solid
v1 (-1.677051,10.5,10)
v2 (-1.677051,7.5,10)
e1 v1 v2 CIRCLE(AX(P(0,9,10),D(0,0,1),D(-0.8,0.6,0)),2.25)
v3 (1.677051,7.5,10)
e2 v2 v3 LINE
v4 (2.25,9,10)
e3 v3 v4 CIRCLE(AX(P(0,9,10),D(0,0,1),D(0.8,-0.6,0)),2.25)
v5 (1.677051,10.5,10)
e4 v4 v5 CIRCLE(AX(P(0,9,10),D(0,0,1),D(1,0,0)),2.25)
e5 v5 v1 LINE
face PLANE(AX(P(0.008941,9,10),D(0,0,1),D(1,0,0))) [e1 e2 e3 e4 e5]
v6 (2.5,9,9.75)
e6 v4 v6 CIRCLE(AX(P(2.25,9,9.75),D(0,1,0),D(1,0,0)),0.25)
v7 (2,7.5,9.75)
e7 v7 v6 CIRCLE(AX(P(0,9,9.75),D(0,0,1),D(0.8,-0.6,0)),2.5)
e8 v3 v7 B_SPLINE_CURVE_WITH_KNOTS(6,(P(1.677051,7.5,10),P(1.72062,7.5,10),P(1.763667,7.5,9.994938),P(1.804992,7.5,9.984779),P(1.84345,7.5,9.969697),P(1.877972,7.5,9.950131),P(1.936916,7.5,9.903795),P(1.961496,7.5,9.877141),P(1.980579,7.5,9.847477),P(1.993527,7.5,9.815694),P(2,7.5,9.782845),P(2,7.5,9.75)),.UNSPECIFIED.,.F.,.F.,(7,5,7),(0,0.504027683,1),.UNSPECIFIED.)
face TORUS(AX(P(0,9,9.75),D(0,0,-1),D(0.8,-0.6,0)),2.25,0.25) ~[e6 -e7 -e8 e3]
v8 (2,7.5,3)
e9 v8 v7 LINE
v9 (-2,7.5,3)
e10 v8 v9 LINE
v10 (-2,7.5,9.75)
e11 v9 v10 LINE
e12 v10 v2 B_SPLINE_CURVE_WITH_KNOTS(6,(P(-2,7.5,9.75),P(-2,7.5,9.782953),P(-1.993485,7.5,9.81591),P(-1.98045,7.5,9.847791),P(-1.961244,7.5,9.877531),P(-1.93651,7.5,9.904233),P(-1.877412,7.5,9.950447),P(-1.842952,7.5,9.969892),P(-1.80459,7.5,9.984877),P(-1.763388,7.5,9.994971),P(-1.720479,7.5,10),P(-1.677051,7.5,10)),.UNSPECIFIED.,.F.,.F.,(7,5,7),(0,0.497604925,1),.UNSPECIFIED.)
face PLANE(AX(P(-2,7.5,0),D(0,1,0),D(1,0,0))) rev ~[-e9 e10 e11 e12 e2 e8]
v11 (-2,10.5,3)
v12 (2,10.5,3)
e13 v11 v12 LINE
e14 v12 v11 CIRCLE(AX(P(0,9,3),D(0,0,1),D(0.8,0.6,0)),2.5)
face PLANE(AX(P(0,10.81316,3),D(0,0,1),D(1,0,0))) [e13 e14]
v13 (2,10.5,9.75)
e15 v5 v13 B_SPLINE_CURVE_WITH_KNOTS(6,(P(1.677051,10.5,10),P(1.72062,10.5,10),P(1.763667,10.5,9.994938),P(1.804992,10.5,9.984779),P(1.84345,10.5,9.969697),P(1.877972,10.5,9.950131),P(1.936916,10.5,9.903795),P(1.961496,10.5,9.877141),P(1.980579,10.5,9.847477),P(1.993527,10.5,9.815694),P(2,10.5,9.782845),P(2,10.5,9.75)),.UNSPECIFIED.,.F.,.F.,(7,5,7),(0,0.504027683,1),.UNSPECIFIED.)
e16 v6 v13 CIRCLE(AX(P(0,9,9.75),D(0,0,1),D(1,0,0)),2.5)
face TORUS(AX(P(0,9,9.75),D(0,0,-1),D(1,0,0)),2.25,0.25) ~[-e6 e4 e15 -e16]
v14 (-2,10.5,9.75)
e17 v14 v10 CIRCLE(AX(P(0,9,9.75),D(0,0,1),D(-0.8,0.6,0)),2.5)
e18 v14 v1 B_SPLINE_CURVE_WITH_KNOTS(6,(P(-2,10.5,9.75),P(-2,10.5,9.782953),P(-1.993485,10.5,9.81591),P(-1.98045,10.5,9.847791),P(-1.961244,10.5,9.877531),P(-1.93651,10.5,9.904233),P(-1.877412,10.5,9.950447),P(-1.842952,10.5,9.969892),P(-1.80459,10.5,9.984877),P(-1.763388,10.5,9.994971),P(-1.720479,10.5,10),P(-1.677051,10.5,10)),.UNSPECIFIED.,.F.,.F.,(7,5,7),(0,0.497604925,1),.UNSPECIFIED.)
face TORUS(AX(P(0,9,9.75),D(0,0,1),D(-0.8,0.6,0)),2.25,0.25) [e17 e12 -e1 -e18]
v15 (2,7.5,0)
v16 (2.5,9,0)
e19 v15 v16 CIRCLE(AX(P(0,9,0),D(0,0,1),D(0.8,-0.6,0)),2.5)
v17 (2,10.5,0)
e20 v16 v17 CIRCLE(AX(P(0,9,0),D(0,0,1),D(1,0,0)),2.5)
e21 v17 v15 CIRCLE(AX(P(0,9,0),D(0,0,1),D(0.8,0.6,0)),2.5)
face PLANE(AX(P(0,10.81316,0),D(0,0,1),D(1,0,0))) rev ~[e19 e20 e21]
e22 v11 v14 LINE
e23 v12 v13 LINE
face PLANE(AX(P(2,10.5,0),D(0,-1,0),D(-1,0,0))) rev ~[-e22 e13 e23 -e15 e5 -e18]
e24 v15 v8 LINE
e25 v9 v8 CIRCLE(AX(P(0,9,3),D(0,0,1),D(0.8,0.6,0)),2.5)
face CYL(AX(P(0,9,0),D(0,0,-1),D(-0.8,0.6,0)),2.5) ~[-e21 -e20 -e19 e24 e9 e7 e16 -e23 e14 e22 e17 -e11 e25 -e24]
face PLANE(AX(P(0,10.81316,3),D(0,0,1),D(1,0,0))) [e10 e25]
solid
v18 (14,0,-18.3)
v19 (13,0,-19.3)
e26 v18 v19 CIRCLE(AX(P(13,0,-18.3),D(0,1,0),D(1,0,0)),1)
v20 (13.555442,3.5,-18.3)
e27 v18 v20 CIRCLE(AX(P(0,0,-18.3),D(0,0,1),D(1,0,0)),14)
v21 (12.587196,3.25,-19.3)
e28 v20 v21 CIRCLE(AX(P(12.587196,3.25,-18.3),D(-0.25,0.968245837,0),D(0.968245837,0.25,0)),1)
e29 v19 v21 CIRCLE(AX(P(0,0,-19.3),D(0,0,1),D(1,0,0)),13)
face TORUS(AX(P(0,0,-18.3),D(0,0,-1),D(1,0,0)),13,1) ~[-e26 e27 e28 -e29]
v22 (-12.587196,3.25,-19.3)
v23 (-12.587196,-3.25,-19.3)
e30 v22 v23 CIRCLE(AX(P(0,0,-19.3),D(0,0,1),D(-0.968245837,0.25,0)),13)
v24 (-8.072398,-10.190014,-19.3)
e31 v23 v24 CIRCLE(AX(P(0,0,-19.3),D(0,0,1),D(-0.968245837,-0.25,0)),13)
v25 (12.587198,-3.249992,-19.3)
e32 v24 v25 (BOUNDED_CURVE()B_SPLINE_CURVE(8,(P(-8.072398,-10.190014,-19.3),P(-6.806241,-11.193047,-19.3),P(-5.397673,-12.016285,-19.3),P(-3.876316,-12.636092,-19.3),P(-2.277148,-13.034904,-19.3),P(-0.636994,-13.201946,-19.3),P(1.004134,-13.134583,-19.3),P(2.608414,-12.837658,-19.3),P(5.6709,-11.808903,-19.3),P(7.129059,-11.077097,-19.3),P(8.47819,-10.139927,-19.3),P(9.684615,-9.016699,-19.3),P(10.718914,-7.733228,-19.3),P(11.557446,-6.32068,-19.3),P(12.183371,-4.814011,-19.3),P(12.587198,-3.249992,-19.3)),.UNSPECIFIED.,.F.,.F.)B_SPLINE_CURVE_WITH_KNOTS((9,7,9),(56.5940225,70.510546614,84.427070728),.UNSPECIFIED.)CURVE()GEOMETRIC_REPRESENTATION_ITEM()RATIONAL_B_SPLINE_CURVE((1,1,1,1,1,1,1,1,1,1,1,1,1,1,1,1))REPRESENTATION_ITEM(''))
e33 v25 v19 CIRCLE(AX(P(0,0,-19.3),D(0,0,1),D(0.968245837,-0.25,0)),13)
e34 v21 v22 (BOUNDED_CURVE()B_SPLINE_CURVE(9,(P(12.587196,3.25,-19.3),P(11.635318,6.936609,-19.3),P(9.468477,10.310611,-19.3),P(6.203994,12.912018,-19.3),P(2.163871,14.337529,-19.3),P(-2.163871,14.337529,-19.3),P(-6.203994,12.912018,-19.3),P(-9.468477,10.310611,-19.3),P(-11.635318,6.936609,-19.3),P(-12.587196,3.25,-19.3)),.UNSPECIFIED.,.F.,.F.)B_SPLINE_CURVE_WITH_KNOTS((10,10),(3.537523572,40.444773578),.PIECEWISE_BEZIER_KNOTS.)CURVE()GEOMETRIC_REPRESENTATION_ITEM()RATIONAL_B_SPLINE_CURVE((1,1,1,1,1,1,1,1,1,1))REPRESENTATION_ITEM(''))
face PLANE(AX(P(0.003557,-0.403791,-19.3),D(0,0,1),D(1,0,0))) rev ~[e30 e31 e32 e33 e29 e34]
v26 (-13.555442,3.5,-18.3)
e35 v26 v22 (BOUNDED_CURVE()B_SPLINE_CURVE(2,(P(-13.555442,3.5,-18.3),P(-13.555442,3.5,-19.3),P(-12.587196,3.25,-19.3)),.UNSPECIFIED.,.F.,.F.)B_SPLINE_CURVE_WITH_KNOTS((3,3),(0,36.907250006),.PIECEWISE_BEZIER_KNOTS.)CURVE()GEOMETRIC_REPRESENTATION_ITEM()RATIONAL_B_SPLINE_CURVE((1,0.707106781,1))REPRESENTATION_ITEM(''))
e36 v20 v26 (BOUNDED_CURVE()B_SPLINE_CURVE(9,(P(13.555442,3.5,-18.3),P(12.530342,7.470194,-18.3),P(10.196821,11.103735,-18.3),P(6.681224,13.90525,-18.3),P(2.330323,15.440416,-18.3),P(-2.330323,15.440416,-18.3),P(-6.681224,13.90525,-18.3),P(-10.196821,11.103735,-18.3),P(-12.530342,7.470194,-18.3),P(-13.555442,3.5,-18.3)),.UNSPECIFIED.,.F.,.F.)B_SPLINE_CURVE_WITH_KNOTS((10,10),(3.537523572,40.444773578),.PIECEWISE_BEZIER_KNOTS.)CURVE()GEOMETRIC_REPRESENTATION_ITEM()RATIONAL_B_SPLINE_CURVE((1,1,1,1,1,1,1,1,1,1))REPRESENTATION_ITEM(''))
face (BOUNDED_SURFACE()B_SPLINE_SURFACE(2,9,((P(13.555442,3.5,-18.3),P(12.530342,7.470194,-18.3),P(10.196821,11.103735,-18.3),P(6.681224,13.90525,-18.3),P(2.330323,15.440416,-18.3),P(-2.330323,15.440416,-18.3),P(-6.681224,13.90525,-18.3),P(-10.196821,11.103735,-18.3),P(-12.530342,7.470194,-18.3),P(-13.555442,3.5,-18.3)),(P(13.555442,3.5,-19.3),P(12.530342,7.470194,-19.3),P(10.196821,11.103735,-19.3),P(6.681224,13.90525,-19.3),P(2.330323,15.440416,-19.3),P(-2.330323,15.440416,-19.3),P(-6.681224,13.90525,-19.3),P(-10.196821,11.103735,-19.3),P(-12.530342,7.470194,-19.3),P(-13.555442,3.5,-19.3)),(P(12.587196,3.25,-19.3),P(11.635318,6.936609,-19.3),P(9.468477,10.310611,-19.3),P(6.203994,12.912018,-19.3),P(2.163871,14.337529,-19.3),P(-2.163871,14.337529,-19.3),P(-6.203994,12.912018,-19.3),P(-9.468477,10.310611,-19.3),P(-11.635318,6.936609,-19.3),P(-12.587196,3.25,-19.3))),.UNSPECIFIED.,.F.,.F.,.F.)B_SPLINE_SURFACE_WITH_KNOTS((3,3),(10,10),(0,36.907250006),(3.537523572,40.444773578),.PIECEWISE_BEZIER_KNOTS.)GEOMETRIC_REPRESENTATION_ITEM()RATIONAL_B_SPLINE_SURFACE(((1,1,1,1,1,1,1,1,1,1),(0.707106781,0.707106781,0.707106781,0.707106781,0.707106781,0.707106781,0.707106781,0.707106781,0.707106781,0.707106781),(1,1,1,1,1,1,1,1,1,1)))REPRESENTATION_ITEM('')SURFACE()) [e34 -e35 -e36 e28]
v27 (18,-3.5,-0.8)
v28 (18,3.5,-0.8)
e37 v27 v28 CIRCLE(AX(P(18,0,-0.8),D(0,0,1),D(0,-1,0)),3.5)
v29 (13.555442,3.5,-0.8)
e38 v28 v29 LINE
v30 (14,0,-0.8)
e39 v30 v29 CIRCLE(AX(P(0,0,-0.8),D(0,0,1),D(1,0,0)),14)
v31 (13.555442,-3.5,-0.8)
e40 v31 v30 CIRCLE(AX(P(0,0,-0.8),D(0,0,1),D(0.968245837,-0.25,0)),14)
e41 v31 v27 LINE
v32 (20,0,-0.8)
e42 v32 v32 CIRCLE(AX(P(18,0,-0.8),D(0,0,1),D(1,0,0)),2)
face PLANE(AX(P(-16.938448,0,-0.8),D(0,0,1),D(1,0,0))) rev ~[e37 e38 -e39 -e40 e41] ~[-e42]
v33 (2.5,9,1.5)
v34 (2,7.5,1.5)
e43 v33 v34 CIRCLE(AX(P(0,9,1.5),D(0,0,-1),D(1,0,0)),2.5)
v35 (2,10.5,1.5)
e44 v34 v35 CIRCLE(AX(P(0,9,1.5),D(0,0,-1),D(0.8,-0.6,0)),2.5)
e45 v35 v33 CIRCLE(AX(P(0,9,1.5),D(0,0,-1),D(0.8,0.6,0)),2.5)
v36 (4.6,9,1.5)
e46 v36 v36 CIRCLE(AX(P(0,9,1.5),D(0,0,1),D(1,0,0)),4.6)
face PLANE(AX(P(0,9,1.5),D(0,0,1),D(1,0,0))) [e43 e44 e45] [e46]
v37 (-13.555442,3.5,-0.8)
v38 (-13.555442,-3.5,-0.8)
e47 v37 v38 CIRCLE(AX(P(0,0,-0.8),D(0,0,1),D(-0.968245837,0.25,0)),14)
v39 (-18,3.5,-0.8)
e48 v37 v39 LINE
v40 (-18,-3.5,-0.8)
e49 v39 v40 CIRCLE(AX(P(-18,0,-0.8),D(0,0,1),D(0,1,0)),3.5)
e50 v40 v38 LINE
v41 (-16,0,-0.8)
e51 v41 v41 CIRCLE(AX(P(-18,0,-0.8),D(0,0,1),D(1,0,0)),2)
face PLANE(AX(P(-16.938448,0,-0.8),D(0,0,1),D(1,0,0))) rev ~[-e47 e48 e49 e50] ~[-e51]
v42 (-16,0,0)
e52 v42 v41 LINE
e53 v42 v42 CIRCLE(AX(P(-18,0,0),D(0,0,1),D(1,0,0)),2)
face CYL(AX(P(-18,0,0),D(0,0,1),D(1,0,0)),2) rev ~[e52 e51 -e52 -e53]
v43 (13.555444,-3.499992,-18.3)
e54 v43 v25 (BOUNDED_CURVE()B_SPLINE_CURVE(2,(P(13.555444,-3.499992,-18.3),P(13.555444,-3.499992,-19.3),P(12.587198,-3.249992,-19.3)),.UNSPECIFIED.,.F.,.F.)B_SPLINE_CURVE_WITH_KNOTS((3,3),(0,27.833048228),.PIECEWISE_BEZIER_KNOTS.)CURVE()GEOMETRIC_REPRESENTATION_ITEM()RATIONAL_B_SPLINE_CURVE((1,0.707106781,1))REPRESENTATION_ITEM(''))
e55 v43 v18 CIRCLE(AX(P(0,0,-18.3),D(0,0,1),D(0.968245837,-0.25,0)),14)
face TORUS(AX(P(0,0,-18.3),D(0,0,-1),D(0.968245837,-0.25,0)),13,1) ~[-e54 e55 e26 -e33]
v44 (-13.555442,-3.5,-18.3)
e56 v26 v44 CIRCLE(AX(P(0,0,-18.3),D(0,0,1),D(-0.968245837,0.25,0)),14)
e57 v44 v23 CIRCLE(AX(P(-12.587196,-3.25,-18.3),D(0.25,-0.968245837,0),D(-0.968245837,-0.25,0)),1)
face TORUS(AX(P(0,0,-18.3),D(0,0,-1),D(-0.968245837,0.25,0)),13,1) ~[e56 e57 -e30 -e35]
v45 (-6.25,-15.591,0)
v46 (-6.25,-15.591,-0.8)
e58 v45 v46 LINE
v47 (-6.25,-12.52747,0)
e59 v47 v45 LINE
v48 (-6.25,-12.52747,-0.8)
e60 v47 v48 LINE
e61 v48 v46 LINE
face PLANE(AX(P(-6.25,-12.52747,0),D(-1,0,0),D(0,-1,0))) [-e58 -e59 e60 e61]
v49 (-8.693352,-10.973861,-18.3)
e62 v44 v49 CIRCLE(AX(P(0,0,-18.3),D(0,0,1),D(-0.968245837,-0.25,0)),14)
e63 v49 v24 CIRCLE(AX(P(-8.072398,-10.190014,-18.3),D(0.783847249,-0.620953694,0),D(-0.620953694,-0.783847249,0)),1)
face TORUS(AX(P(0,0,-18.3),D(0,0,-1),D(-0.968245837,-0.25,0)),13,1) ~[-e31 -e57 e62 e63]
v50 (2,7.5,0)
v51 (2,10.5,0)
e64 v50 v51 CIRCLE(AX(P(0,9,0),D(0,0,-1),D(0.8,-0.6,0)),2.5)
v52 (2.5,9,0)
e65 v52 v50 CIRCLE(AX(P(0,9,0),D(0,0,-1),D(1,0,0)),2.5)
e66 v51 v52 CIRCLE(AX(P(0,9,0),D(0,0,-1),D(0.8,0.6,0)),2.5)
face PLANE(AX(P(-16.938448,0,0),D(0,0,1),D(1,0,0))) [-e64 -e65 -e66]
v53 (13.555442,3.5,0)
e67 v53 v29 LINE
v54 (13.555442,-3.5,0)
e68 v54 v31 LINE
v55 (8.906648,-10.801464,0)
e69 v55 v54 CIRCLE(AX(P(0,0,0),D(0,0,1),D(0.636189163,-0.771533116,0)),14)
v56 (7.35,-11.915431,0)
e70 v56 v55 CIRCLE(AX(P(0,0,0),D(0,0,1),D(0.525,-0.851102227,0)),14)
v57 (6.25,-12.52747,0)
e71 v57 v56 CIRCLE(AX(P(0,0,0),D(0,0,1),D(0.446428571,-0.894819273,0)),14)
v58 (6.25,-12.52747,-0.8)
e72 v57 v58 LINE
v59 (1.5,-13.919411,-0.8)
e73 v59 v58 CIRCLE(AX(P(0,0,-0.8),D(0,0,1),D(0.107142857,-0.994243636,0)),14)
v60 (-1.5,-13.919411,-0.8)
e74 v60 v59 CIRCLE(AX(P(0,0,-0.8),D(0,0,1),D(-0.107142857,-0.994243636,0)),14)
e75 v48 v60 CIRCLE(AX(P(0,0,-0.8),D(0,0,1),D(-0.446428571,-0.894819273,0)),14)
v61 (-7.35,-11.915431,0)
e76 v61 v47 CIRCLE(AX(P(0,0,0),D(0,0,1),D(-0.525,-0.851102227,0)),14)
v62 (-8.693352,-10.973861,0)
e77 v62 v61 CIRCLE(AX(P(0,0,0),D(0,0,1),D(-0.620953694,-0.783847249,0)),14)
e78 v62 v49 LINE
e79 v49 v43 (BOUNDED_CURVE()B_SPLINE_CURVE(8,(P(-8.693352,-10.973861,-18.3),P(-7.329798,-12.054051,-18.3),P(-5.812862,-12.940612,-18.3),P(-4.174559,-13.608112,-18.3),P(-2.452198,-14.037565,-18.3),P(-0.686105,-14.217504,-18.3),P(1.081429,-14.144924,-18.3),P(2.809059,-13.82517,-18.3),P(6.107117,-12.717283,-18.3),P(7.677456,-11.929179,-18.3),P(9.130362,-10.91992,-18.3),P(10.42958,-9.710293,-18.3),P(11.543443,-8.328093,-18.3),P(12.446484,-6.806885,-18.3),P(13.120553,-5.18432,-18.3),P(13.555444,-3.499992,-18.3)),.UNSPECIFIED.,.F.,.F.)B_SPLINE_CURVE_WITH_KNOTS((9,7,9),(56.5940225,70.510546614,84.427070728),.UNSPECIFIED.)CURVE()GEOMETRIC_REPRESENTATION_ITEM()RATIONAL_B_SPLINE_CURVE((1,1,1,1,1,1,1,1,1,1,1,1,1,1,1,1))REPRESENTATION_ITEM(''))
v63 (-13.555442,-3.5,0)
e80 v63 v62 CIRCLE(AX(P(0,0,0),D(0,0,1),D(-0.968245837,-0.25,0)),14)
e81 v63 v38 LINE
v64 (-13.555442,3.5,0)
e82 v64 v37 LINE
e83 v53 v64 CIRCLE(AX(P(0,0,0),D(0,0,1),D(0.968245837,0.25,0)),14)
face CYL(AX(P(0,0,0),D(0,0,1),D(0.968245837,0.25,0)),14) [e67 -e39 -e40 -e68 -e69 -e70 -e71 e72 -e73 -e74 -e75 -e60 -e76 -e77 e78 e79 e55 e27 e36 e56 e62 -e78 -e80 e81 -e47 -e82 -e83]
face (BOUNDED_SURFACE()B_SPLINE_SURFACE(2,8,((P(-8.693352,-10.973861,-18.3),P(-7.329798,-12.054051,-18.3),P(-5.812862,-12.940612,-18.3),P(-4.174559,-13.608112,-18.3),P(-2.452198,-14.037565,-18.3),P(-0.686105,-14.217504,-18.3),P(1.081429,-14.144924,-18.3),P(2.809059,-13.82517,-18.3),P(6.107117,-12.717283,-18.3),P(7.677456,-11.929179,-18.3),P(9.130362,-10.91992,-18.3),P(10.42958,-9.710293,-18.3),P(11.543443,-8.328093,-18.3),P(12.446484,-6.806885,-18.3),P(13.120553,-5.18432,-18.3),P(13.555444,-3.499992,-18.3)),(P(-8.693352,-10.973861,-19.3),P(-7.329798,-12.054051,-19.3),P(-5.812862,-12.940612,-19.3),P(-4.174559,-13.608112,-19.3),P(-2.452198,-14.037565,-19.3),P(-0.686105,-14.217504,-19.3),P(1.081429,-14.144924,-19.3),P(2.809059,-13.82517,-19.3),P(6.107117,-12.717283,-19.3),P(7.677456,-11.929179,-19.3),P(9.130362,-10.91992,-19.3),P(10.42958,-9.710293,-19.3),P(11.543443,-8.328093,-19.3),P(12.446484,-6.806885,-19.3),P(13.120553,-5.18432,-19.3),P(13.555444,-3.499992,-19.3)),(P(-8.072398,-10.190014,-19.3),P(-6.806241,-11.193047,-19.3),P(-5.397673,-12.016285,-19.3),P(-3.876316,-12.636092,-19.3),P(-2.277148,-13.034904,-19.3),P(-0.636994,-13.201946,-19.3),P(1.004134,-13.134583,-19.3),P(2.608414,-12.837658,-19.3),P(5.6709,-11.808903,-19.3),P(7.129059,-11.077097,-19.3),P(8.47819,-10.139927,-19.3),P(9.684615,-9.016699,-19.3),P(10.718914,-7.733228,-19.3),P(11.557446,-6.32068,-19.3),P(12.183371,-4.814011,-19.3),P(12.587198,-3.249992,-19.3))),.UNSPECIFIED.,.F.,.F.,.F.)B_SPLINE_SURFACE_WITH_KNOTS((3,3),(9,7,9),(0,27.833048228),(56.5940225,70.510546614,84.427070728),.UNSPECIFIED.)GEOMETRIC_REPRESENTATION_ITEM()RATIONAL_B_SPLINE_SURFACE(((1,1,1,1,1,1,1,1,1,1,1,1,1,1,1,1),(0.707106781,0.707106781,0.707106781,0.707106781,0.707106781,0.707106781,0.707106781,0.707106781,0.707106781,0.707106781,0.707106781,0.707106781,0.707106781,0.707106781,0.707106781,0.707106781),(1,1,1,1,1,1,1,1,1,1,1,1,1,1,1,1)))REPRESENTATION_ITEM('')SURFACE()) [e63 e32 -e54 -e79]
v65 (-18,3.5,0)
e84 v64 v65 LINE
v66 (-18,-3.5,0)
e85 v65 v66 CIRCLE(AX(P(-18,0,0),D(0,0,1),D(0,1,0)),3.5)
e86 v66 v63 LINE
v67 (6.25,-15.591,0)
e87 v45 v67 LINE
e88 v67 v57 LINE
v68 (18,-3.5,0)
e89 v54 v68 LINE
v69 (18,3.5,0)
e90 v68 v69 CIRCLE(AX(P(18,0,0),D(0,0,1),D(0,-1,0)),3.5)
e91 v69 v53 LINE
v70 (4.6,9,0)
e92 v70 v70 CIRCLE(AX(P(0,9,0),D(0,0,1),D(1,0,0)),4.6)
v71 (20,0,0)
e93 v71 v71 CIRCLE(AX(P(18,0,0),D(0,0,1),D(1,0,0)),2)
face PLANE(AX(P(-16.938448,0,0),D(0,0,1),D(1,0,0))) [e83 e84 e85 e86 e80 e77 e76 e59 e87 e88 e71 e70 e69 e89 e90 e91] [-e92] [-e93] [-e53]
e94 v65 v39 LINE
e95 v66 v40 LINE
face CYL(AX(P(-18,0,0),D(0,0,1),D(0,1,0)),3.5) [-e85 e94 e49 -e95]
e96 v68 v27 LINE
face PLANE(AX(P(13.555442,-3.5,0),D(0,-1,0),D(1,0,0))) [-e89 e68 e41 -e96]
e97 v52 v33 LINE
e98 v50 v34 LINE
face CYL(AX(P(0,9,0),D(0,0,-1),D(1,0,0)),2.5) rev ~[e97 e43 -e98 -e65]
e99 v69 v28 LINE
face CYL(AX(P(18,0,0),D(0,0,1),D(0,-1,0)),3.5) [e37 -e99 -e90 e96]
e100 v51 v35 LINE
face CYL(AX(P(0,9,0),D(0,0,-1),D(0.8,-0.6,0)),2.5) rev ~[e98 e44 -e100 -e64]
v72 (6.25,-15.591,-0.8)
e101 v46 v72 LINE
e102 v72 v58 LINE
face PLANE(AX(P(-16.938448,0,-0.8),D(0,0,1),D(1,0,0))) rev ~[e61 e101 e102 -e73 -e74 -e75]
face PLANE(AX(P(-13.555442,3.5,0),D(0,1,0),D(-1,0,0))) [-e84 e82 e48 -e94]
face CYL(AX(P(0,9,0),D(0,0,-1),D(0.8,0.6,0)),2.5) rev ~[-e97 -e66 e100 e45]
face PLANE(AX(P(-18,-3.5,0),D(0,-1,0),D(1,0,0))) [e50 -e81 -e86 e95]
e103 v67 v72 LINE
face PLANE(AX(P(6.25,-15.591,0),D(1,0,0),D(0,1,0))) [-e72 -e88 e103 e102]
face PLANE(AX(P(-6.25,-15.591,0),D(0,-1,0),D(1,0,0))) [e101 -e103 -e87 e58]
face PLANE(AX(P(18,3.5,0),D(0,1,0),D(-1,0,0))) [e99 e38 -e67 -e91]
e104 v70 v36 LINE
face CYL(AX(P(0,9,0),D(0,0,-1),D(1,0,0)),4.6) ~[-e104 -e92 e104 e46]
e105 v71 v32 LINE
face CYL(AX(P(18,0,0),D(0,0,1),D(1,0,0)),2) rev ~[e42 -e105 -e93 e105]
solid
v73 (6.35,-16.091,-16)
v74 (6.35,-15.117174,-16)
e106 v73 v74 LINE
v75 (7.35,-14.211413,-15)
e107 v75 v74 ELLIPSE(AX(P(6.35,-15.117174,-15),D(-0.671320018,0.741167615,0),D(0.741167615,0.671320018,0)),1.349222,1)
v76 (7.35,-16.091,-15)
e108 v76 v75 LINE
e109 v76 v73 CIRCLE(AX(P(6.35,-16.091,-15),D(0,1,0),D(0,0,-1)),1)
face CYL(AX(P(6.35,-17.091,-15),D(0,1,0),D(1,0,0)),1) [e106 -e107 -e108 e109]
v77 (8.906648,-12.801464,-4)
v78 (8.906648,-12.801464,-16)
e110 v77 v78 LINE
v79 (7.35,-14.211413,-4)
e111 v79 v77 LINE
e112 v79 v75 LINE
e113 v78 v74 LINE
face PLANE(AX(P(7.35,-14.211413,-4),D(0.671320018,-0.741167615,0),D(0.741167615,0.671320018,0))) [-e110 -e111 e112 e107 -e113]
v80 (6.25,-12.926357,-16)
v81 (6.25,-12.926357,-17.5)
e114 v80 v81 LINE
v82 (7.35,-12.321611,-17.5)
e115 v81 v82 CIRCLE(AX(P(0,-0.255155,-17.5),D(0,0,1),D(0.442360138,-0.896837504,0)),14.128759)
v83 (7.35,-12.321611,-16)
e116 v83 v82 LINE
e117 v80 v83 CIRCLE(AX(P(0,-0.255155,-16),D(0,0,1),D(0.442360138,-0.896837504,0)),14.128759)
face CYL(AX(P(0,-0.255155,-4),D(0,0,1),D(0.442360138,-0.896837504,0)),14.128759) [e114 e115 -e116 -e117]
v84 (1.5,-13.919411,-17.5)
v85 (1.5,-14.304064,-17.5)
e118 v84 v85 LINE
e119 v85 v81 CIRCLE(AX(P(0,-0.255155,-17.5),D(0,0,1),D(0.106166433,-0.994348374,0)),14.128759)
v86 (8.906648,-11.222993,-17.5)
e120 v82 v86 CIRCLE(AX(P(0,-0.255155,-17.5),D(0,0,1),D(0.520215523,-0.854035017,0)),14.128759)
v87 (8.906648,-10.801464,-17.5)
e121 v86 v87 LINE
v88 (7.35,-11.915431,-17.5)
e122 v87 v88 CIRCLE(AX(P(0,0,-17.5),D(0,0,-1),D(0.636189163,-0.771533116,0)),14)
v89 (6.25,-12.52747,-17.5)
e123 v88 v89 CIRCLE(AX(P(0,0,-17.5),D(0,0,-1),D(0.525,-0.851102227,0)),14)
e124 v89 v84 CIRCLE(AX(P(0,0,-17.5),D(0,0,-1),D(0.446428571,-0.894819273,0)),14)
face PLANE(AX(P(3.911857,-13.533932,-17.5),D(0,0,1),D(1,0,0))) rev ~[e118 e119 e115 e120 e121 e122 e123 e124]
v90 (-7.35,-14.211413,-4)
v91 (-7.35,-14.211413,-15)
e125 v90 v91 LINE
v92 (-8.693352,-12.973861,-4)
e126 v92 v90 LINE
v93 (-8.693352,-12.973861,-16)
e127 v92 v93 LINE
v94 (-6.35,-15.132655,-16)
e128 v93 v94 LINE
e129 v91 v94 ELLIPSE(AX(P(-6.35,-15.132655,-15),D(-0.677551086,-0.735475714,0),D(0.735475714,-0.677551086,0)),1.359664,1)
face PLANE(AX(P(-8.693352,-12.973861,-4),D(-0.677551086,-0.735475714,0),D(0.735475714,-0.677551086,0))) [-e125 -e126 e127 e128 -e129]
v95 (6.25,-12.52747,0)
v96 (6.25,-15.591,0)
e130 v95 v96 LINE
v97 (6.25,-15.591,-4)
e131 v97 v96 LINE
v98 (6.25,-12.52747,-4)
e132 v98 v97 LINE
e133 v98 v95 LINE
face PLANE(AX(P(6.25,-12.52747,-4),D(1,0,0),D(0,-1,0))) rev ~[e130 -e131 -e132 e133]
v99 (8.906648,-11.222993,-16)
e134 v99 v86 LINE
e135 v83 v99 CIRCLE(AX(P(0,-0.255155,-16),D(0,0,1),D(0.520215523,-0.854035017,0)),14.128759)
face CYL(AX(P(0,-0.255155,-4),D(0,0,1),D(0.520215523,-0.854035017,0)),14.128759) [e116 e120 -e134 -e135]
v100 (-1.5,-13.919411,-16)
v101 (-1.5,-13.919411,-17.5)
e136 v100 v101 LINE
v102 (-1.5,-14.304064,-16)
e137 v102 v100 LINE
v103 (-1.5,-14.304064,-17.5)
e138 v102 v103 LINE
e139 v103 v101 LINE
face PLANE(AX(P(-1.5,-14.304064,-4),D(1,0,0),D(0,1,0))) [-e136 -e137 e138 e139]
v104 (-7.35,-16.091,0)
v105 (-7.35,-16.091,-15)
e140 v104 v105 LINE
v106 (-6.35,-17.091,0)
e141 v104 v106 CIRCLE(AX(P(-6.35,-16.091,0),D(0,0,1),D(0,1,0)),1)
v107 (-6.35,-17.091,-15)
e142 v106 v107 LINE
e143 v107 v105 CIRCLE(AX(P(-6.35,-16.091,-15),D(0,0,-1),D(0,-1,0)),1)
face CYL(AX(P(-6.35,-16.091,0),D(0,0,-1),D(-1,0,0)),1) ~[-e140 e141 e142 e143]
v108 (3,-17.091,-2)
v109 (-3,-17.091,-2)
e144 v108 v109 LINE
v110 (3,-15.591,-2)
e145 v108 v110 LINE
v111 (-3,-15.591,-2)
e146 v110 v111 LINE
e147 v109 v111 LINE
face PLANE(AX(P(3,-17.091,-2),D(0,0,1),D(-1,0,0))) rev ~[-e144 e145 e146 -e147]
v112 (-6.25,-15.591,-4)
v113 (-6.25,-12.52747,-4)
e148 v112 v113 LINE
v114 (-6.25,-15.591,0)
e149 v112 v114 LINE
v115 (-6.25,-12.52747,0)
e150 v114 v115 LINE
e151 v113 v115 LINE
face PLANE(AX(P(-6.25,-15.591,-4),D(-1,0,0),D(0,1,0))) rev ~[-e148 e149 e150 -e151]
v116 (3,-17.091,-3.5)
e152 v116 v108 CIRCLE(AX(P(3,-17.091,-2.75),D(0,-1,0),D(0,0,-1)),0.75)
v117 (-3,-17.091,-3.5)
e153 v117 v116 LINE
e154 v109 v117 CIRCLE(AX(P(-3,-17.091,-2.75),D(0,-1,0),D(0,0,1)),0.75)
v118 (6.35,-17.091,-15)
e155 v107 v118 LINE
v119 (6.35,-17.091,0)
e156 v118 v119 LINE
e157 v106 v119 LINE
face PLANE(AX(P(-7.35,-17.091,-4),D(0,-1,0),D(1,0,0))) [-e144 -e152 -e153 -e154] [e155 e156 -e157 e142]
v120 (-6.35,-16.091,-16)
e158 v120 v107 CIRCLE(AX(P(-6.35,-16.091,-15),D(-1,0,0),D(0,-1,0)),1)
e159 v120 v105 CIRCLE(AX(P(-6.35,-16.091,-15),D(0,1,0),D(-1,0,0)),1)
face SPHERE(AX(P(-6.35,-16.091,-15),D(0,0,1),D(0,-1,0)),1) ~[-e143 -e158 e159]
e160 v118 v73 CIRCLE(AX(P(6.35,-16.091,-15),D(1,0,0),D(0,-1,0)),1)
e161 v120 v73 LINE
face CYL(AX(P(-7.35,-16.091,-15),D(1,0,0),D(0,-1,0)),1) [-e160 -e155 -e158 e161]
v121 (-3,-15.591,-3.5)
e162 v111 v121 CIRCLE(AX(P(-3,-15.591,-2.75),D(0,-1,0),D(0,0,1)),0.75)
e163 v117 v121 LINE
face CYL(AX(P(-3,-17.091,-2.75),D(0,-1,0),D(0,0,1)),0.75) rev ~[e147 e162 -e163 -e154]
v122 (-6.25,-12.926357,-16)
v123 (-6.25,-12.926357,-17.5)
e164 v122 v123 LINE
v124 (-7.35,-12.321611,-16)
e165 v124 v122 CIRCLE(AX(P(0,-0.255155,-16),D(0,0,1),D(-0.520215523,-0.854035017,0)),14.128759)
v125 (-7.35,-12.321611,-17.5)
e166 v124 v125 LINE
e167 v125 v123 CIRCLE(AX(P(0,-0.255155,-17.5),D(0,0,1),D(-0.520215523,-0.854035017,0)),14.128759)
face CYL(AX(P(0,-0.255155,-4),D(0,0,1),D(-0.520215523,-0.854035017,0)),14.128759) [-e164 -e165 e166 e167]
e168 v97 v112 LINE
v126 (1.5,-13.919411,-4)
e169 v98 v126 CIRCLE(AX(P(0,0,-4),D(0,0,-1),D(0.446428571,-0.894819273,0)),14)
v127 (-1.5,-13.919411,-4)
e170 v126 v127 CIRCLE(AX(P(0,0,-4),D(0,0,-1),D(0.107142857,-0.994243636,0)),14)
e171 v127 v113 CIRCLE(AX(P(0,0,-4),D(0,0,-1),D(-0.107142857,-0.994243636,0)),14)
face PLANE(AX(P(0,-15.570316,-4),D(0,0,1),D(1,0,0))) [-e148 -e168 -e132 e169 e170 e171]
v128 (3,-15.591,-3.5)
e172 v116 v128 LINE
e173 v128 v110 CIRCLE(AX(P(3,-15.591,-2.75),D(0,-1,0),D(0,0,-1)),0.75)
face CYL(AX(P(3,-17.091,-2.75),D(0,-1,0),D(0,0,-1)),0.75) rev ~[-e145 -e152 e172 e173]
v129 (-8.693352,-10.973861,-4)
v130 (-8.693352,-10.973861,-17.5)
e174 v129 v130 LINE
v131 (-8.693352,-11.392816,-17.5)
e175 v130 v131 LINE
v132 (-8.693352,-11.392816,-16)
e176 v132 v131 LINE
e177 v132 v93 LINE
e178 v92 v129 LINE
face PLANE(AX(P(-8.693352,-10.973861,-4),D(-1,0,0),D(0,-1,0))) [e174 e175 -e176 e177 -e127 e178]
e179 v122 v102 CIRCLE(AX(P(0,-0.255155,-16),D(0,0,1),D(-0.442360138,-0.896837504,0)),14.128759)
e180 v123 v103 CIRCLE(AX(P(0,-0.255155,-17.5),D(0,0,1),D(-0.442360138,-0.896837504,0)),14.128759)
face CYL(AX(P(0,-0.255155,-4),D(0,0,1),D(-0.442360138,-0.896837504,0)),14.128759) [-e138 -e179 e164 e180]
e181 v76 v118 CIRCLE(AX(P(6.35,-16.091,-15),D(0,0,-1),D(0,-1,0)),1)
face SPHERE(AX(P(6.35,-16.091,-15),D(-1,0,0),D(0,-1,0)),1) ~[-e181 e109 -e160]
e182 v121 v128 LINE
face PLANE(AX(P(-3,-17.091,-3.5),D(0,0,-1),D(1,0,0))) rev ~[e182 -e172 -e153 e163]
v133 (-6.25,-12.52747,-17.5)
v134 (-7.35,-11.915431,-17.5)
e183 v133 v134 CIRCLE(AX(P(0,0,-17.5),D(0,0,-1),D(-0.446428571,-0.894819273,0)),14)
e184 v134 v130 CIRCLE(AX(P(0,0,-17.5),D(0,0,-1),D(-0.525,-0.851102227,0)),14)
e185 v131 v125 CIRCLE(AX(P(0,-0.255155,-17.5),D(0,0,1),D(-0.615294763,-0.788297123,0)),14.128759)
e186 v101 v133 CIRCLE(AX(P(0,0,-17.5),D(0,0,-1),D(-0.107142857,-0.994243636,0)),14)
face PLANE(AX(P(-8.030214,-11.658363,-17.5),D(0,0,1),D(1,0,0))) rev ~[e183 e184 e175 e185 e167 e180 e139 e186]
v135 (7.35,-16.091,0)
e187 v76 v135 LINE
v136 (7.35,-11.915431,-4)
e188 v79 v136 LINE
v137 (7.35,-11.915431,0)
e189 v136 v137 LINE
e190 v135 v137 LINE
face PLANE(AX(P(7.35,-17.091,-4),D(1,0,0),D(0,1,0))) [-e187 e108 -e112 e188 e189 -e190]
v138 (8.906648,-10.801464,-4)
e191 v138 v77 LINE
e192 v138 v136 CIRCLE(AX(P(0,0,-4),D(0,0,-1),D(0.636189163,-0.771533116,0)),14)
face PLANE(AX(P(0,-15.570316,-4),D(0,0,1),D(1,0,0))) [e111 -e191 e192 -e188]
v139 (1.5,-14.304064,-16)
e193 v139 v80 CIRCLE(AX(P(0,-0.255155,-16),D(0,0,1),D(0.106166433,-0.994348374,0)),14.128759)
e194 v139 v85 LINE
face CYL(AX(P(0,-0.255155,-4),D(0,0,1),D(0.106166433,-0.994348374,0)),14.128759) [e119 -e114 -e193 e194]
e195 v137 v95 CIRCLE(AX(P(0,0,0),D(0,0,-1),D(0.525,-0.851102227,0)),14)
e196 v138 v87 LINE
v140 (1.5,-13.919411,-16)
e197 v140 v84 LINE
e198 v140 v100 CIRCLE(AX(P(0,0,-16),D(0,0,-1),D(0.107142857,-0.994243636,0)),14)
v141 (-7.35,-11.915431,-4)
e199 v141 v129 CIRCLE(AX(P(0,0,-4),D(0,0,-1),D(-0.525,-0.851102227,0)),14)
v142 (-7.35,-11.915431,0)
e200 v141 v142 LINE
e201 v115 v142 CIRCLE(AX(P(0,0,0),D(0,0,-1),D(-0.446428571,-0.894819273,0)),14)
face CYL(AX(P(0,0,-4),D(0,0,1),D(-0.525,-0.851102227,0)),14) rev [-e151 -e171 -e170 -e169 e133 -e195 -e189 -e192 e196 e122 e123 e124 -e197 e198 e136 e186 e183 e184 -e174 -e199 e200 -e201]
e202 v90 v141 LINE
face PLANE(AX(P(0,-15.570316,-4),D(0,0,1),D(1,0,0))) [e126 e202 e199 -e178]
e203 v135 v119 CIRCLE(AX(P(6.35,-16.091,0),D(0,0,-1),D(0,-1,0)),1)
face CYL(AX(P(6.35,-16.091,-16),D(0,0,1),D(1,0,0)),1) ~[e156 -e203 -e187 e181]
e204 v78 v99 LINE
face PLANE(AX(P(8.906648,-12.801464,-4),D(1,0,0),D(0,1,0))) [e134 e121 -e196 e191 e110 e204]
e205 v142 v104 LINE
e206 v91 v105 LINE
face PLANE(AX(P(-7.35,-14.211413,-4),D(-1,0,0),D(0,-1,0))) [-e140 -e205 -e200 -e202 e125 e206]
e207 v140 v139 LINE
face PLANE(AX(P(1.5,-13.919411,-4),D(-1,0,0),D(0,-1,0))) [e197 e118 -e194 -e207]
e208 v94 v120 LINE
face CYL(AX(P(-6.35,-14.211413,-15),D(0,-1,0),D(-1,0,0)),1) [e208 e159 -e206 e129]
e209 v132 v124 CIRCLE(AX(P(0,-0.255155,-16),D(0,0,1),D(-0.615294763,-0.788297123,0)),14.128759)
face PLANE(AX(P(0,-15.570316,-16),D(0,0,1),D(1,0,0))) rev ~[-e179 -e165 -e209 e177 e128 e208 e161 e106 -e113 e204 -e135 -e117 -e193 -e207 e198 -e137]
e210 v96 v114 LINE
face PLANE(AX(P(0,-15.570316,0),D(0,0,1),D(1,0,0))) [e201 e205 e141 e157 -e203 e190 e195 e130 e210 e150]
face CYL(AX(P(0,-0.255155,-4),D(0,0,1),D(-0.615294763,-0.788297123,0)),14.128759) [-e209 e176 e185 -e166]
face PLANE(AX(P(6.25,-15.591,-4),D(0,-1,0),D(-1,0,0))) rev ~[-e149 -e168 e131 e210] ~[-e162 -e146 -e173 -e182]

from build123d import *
from build123d import SkipClean  # not in build123d's __all__

# Parameters (mm, degrees)
F0_R      = 2
F0_R_2    = 4.6
F1_DEPTH  = 0.8
F2_DEPTH  = 19.3
F3_R      = 1
F4_DEPTH  = 1.5
F7_DEPTH  = 4
F8_DEPTH  = 12
F9_DEPTH  = 13.5
F11_R     = 1
F14_DEPTH = 3
F15_DEPTH = 3
F16_DEPTH = 10
F17_R     = 0.25


with BuildPart() as f1:
    # F0 (on Top) → F1 (new body)
    with BuildSketch(Plane.XY):
        with BuildLine():
            ThreePointArc((-13.5554417117, -3.5), (-14, 0), (-13.5554417117, 3.5))
            Line((-13.5554417117, 3.5), (-18, 3.5))
            ThreePointArc((-18, 3.5), (-21.5, 0), (-18, -3.5))
            Line((-18, -3.5), (-13.5554417117, -3.5))
        make_face()
        with Locations((-18, 0)):
            Circle(F0_R, mode=Mode.SUBTRACT)
        with BuildLine():
            ThreePointArc((13.5554417117, -3.5), (13.8884157477, -1.7640600948), (14, 0))
            ThreePointArc((14, 0), (13.8884157477, 1.7640600948), (13.5554417117, 3.5))
            ThreePointArc((13.5554417117, 3.5), (0, 14), (-13.5554417117, 3.5))
            ThreePointArc((-13.5554417117, 3.5), (-14, 0), (-13.5554417117, -3.5))
            ThreePointArc((-13.5554417117, -3.5), (-11.7352824288, -7.6343399398), (-8.6933517225, -10.9738614821))
            ThreePointArc((-8.6933517225, -10.9738614821), (-8.0354789523, -11.4643394056), (-7.35, -11.9154311714))
            ThreePointArc((-7.35, -11.9154311714), (-6.8068823867, -12.2338200156), (-6.25, -12.5274698164))
            ThreePointArc((-6.25, -12.5274698164), (-3.937003937, -13.4350288425), (-1.5, -13.9194109071))
            ThreePointArc((-1.5, -13.9194109071), (0, -14), (1.5, -13.9194109071))
            ThreePointArc((1.5, -13.9194109071), (3.937003937, -13.4350288425), (6.25, -12.5274698164))
            ThreePointArc((6.25, -12.5274698164), (6.8068823867, -12.2338200156), (7.35, -11.9154311714))
            ThreePointArc((7.35, -11.9154311714), (8.1473851159, -11.3850830376), (8.9066482775, -10.8014636259))
            ThreePointArc((8.9066482775, -10.8014636259), (11.8094967903, -7.5190282324), (13.5554417117, -3.5))
        make_face()
        with Locations((0, 9)):
            Circle(F0_R_2, mode=Mode.SUBTRACT)
        with BuildLine():
            ThreePointArc((13.5554417117, 3.5), (13.8884157477, 1.7640600948), (14, 0))
            ThreePointArc((14, 0), (13.8884157477, -1.7640600948), (13.5554417117, -3.5))
            Line((13.5554417117, -3.5), (18, -3.5))
            ThreePointArc((18, -3.5), (21.5, 0), (18, 3.5))
            Line((18, 3.5), (13.5554417117, 3.5))
        make_face()
        with Locations((18, 0)):
            Circle(F0_R, mode=Mode.SUBTRACT)
        with Locations((0, 9)):
            Circle(F0_R_2)
        with BuildLine():
            ThreePointArc((2, 10.5), (2.3717082451, 9.790569415), (2.5, 9))
            ThreePointArc((2.5, 9), (2.3717082451, 8.209430585), (2, 7.5))
            ThreePointArc((2, 7.5), (0, 6.5), (-2, 7.5))
            ThreePointArc((-2, 7.5), (-2.5, 9), (-2, 10.5))
            ThreePointArc((-2, 10.5), (0, 11.5), (2, 10.5))
        make_face(mode=Mode.SUBTRACT)
        with BuildLine():
            ThreePointArc((2, 7.5), (2.3717082451, 8.209430585), (2.5, 9))
            ThreePointArc((2.5, 9), (2.3717082451, 9.790569415), (2, 10.5))
            Line((2, 10.5), (-2, 10.5))
            ThreePointArc((-2, 10.5), (-2.5, 9), (-2, 7.5))
            Line((-2, 7.5), (2, 7.5))
        make_face()
        with BuildLine():
            ThreePointArc((-1.5, -13.9194109071), (-3.937003937, -13.4350288425), (-6.25, -12.5274698164))
            Line((-6.25, -12.5274698164), (-6.25, -12.9263565834))
            ThreePointArc((-6.25, -12.9263565834), (-3.9357520983, -13.8246688211), (-1.5, -14.3040642142))
            Line((-1.5, -14.3040642142), (-1.5, -13.9194109071))
        make_face()
        with BuildLine():
            Line((1.5, -14.3040642142), (1.5, -13.9194109071))
            ThreePointArc((1.5, -13.9194109071), (0, -14), (-1.5, -13.9194109071))
            Line((-1.5, -13.9194109071), (-1.5, -14.3040642142))
            ThreePointArc((-1.5, -14.3040642142), (-3.9357520983, -13.8246688211), (-6.25, -12.9263565834))
            Line((-6.25, -12.9263565834), (-6.25, -15.591))
            Line((-6.25, -15.591), (6.25, -15.591))
            Line((6.25, -15.591), (6.25, -12.9263565834))
            ThreePointArc((6.25, -12.9263565834), (3.9357520983, -13.8246688211), (1.5, -14.3040642142))
        make_face()
        with BuildLine():
            Line((1.5, -14.3040642142), (1.5, -13.9194109071))
            ThreePointArc((1.5, -13.9194109071), (0, -14), (-1.5, -13.9194109071))
            Line((-1.5, -13.9194109071), (-1.5, -14.3040642142))
            ThreePointArc((-1.5, -14.3040642142), (-3.9357520983, -13.8246688211), (-6.25, -12.9263565834))
            Line((-6.25, -12.9263565834), (-6.25, -15.591))
            Line((-6.25, -15.591), (6.25, -15.591))
            Line((6.25, -15.591), (6.25, -12.9263565834))
            ThreePointArc((6.25, -12.9263565834), (3.9357520983, -13.8246688211), (1.5, -14.3040642142))
        make_face()
        with BuildLine():
            Line((6.25, -12.9263565834), (6.25, -12.5274698164))
            ThreePointArc((6.25, -12.5274698164), (3.937003937, -13.4350288425), (1.5, -13.9194109071))
            Line((1.5, -13.9194109071), (1.5, -14.3040642142))
            ThreePointArc((1.5, -14.3040642142), (3.9357520983, -13.8246688211), (6.25, -12.9263565834))
        make_face()
        with BuildLine():
            Line((-2, 10.5), (2, 10.5))
            ThreePointArc((2, 10.5), (0, 11.5), (-2, 10.5))
        make_face()
        with BuildLine():
            ThreePointArc((-2, 7.5), (0, 6.5), (2, 7.5))
            Line((2, 7.5), (-2, 7.5))
        make_face()
    extrude(amount=-F1_DEPTH)

    # F0 (on Top) → F2 (join)
    with BuildSketch(Plane.XY):
        with BuildLine():
            ThreePointArc((13.5554417117, -3.5), (13.8884157477, -1.7640600948), (14, 0))
            ThreePointArc((14, 0), (13.8884157477, 1.7640600948), (13.5554417117, 3.5))
            ThreePointArc((13.5554417117, 3.5), (0, 14), (-13.5554417117, 3.5))
            ThreePointArc((-13.5554417117, 3.5), (-14, 0), (-13.5554417117, -3.5))
            ThreePointArc((-13.5554417117, -3.5), (-11.7352824288, -7.6343399398), (-8.6933517225, -10.9738614821))
            ThreePointArc((-8.6933517225, -10.9738614821), (-8.0354789523, -11.4643394056), (-7.35, -11.9154311714))
            ThreePointArc((-7.35, -11.9154311714), (-6.8068823867, -12.2338200156), (-6.25, -12.5274698164))
            ThreePointArc((-6.25, -12.5274698164), (-3.937003937, -13.4350288425), (-1.5, -13.9194109071))
            ThreePointArc((-1.5, -13.9194109071), (0, -14), (1.5, -13.9194109071))
            ThreePointArc((1.5, -13.9194109071), (3.937003937, -13.4350288425), (6.25, -12.5274698164))
            ThreePointArc((6.25, -12.5274698164), (6.8068823867, -12.2338200156), (7.35, -11.9154311714))
            ThreePointArc((7.35, -11.9154311714), (8.1473851159, -11.3850830376), (8.9066482775, -10.8014636259))
            ThreePointArc((8.9066482775, -10.8014636259), (11.8094967903, -7.5190282324), (13.5554417117, -3.5))
        make_face()
        with Locations((0, 9)):
            Circle(F0_R_2, mode=Mode.SUBTRACT)
        with Locations((0, 9)):
            Circle(F0_R_2)
        with BuildLine():
            ThreePointArc((2, 10.5), (2.3717082451, 9.790569415), (2.5, 9))
            ThreePointArc((2.5, 9), (2.3717082451, 8.209430585), (2, 7.5))
            ThreePointArc((2, 7.5), (0, 6.5), (-2, 7.5))
            ThreePointArc((-2, 7.5), (-2.5, 9), (-2, 10.5))
            ThreePointArc((-2, 10.5), (0, 11.5), (2, 10.5))
        make_face(mode=Mode.SUBTRACT)
        with BuildLine():
            ThreePointArc((2, 7.5), (2.3717082451, 8.209430585), (2.5, 9))
            ThreePointArc((2.5, 9), (2.3717082451, 9.790569415), (2, 10.5))
            Line((2, 10.5), (-2, 10.5))
            ThreePointArc((-2, 10.5), (-2.5, 9), (-2, 7.5))
            Line((-2, 7.5), (2, 7.5))
        make_face()
        with BuildLine():
            Line((-2, 10.5), (2, 10.5))
            ThreePointArc((2, 10.5), (0, 11.5), (-2, 10.5))
        make_face()
        with BuildLine():
            ThreePointArc((-2, 7.5), (0, 6.5), (2, 7.5))
            Line((2, 7.5), (-2, 7.5))
        make_face()
    extrude(amount=-F2_DEPTH)

    # F3
    f3_edges = [f1.edges().sort_by_distance(p)[0] for p in [
        (13.555442, 3.5, -19.3),
    ]]
    fillet(f3_edges, radius=F3_R)

    # F0 (on Top) → F4 (join)
    with BuildSketch(Plane.XY):
        with Locations((0, 9)):
            Circle(F0_R_2)
        with BuildLine():
            ThreePointArc((2, 10.5), (2.3717082451, 9.790569415), (2.5, 9))
            ThreePointArc((2.5, 9), (2.3717082451, 8.209430585), (2, 7.5))
            ThreePointArc((2, 7.5), (0, 6.5), (-2, 7.5))
            ThreePointArc((-2, 7.5), (-2.5, 9), (-2, 10.5))
            ThreePointArc((-2, 10.5), (0, 11.5), (2, 10.5))
        make_face(mode=Mode.SUBTRACT)
    extrude(amount=F4_DEPTH)


with BuildPart() as f7:
    # F6 (on offset) → F7 (new body)
    with BuildSketch(Plane.XY.offset(-4)):
        with BuildLine():
            ThreePointArc((-6.25, -12.9263565834), (-6.8067194333, -12.6362058443), (-7.35, -12.3216105412))
            Line((-7.35, -12.3216105412), (-7.35, -14.2114134505))
            Line((-7.35, -14.2114134505), (-7.35, -17.091))
            Line((-7.35, -17.091), (7.35, -17.091))
            Line((7.35, -17.091), (7.35, -14.2114134505))
            Line((7.35, -14.2114134505), (7.35, -12.3216105412))
            ThreePointArc((7.35, -12.3216105412), (6.8067194333, -12.6362058443), (6.25, -12.9263565834))
            Line((6.25, -12.9263565834), (6.25, -15.591))
            Line((6.25, -15.591), (-6.25, -15.591))
            Line((-6.25, -15.591), (-6.25, -12.9263565834))
        make_face()
        with BuildLine():
            ThreePointArc((-6.25, -12.5274698164), (-6.8068823867, -12.2338200156), (-7.35, -11.9154311714))
            Line((-7.35, -11.9154311714), (-7.35, -12.3216105412))
            ThreePointArc((-7.35, -12.3216105412), (-6.8067194333, -12.6362058443), (-6.25, -12.9263565834))
            Line((-6.25, -12.9263565834), (-6.25, -12.5274698164))
        make_face()
        with BuildLine():
            Line((7.35, -12.3216105412), (7.35, -11.9154311714))
            ThreePointArc((7.35, -11.9154311714), (6.8068823867, -12.2338200156), (6.25, -12.5274698164))
            Line((6.25, -12.5274698164), (6.25, -12.9263565834))
            ThreePointArc((6.25, -12.9263565834), (6.8067194333, -12.6362058443), (7.35, -12.3216105412))
        make_face()
    extrude(amount=F7_DEPTH)

    # F6 (on offset) → F8 (join)
    with BuildSketch(Plane.XY.offset(-4)):
        with BuildLine():
            ThreePointArc((-6.25, -12.9263565834), (-6.8067194333, -12.6362058443), (-7.35, -12.3216105412))
            Line((-7.35, -12.3216105412), (-7.35, -14.2114134505))
            Line((-7.35, -14.2114134505), (-7.35, -17.091))
            Line((-7.35, -17.091), (7.35, -17.091))
            Line((7.35, -17.091), (7.35, -14.2114134505))
            Line((7.35, -14.2114134505), (7.35, -12.3216105412))
            ThreePointArc((7.35, -12.3216105412), (6.8067194333, -12.6362058443), (6.25, -12.9263565834))
            Line((6.25, -12.9263565834), (6.25, -15.591))
            Line((6.25, -15.591), (-6.25, -15.591))
            Line((-6.25, -15.591), (-6.25, -12.9263565834))
        make_face()
        with BuildLine():
            ThreePointArc((-1.5, -13.9194109071), (-3.937003937, -13.4350288425), (-6.25, -12.5274698164))
            Line((-6.25, -12.5274698164), (-6.25, -12.9263565834))
            ThreePointArc((-6.25, -12.9263565834), (-3.9357520983, -13.8246688211), (-1.5, -14.3040642142))
            Line((-1.5, -14.3040642142), (-1.5, -13.9194109071))
        make_face()
        with BuildLine():
            ThreePointArc((-6.25, -12.5274698164), (-6.8068823867, -12.2338200156), (-7.35, -11.9154311714))
            Line((-7.35, -11.9154311714), (-7.35, -12.3216105412))
            ThreePointArc((-7.35, -12.3216105412), (-6.8067194333, -12.6362058443), (-6.25, -12.9263565834))
            Line((-6.25, -12.9263565834), (-6.25, -12.5274698164))
        make_face()
        with BuildLine():
            ThreePointArc((-7.35, -11.9154311714), (-8.0354789523, -11.4643394056), (-8.6933517225, -10.9738614821))
            Line((-8.6933517225, -10.9738614821), (-8.6933517225, -11.3928156516))
            ThreePointArc((-8.6933517225, -11.3928156516), (-8.0351072557, -11.876639438), (-7.35, -12.3216105412))
            Line((-7.35, -12.3216105412), (-7.35, -11.9154311714))
        make_face()
        with BuildLine():
            ThreePointArc((-7.35, -12.3216105412), (-8.0351072557, -11.876639438), (-8.6933517225, -11.3928156516))
            Line((-8.6933517225, -11.3928156516), (-8.6933517225, -12.9738614821))
            Line((-8.6933517225, -12.9738614821), (-7.35, -14.2114134505))
            Line((-7.35, -14.2114134505), (-7.35, -12.3216105412))
        make_face()
        with BuildLine():
            Line((7.35, -12.3216105412), (7.35, -11.9154311714))
            ThreePointArc((7.35, -11.9154311714), (6.8068823867, -12.2338200156), (6.25, -12.5274698164))
            Line((6.25, -12.5274698164), (6.25, -12.9263565834))
            ThreePointArc((6.25, -12.9263565834), (6.8067194333, -12.6362058443), (7.35, -12.3216105412))
        make_face()
        with BuildLine():
            Line((8.9066482775, -11.2229927703), (8.9066482775, -10.8014636259))
            ThreePointArc((8.9066482775, -10.8014636259), (8.1473851159, -11.3850830376), (7.35, -11.9154311714))
            Line((7.35, -11.9154311714), (7.35, -12.3216105412))
            ThreePointArc((7.35, -12.3216105412), (8.146864032, -11.7985711133), (8.9066482775, -11.2229927703))
        make_face()
        with BuildLine():
            Line((8.9066482775, -12.8014636259), (8.9066482775, -11.2229927703))
            ThreePointArc((8.9066482775, -11.2229927703), (8.146864032, -11.7985711133), (7.35, -12.3216105412))
            Line((7.35, -12.3216105412), (7.35, -14.2114134505))
            Line((7.35, -14.2114134505), (8.9066482775, -12.8014636259))
        make_face()
        with BuildLine():
            Line((6.25, -12.9263565834), (6.25, -12.5274698164))
            ThreePointArc((6.25, -12.5274698164), (3.937003937, -13.4350288425), (1.5, -13.9194109071))
            Line((1.5, -13.9194109071), (1.5, -14.3040642142))
            ThreePointArc((1.5, -14.3040642142), (3.9357520983, -13.8246688211), (6.25, -12.9263565834))
        make_face()
        with BuildLine():
            ThreePointArc((1.5, -13.9194109071), (0, -14), (-1.5, -13.9194109071))
            Line((-1.5, -13.9194109071), (-1.5, -14.3040642142))
            ThreePointArc((-1.5, -14.3040642142), (-3.9357520983, -13.8246688211), (-6.25, -12.9263565834))
            Line((-6.25, -12.9263565834), (-6.25, -15.591))
            Line((-6.25, -15.591), (6.25, -15.591))
            Line((6.25, -15.591), (6.25, -12.9263565834))
            ThreePointArc((6.25, -12.9263565834), (3.9357520983, -13.8246688211), (1.5, -14.3040642142))
            Line((1.5, -14.3040642142), (1.5, -13.9194109071))
        make_face()
    extrude(amount=-F8_DEPTH)

    # F6 (on offset) → F9 (join)
    with BuildSketch(Plane.XY.offset(-4)):
        with BuildLine():
            ThreePointArc((-7.35, -11.9154311714), (-8.0354789523, -11.4643394056), (-8.6933517225, -10.9738614821))
            Line((-8.6933517225, -10.9738614821), (-8.6933517225, -11.3928156516))
            ThreePointArc((-8.6933517225, -11.3928156516), (-8.0351072557, -11.876639438), (-7.35, -12.3216105412))
            Line((-7.35, -12.3216105412), (-7.35, -11.9154311714))
        make_face()
        with BuildLine():
            ThreePointArc((-6.25, -12.5274698164), (-6.8068823867, -12.2338200156), (-7.35, -11.9154311714))
            Line((-7.35, -11.9154311714), (-7.35, -12.3216105412))
            ThreePointArc((-7.35, -12.3216105412), (-6.8067194333, -12.6362058443), (-6.25, -12.9263565834))
            Line((-6.25, -12.9263565834), (-6.25, -12.5274698164))
        make_face()
        with BuildLine():
            ThreePointArc((-1.5, -13.9194109071), (-3.937003937, -13.4350288425), (-6.25, -12.5274698164))
            Line((-6.25, -12.5274698164), (-6.25, -12.9263565834))
            ThreePointArc((-6.25, -12.9263565834), (-3.9357520983, -13.8246688211), (-1.5, -14.3040642142))
            Line((-1.5, -14.3040642142), (-1.5, -13.9194109071))
        make_face()
        with BuildLine():
            Line((6.25, -12.9263565834), (6.25, -12.5274698164))
            ThreePointArc((6.25, -12.5274698164), (3.937003937, -13.4350288425), (1.5, -13.9194109071))
            Line((1.5, -13.9194109071), (1.5, -14.3040642142))
            ThreePointArc((1.5, -14.3040642142), (3.9357520983, -13.8246688211), (6.25, -12.9263565834))
        make_face()
        with BuildLine():
            Line((7.35, -12.3216105412), (7.35, -11.9154311714))
            ThreePointArc((7.35, -11.9154311714), (6.8068823867, -12.2338200156), (6.25, -12.5274698164))
            Line((6.25, -12.5274698164), (6.25, -12.9263565834))
            ThreePointArc((6.25, -12.9263565834), (6.8067194333, -12.6362058443), (7.35, -12.3216105412))
        make_face()
        with BuildLine():
            Line((8.9066482775, -11.2229927703), (8.9066482775, -10.8014636259))
            ThreePointArc((8.9066482775, -10.8014636259), (8.1473851159, -11.3850830376), (7.35, -11.9154311714))
            Line((7.35, -11.9154311714), (7.35, -12.3216105412))
            ThreePointArc((7.35, -12.3216105412), (8.146864032, -11.7985711133), (8.9066482775, -11.2229927703))
        make_face()
    extrude(amount=-F9_DEPTH)

    # F10: union 

    # F11
    f11_edges = [f7.edges().sort_by_distance(p)[0] for p in [
        (-7.35, -17.091, -8),
        (0, -17.091, -16),
        (7.35, -17.091, -8),
        (-7.35, -15.651207, -16),
        (7.35, -15.651207, -16),
    ]]
    fillet(f11_edges, radius=F11_R)

    # F13 (on offset) → F14 (cut)
    with BuildSketch(Plane.XZ.offset(17.091)):
        with BuildLine():
            ThreePointArc((3, -3.5), (3.75, -2.75), (3, -2))
            Line((3, -2), (-3, -2))
            ThreePointArc((-3, -2), (-3.75, -2.75), (-3, -3.5))
            Line((-3, -3.5), (3, -3.5))
        make_face()
    extrude(amount=-F14_DEPTH, mode=Mode.SUBTRACT)


with BuildPart() as f15:
    # F0 (on Top) → F15 (new body)
    with BuildSketch(Plane.XY):
        with BuildLine():
            Line((-2, 10.5), (2, 10.5))
            ThreePointArc((2, 10.5), (0, 11.5), (-2, 10.5))
        make_face()
        with BuildLine():
            ThreePointArc((2, 7.5), (2.3717082451, 8.209430585), (2.5, 9))
            ThreePointArc((2.5, 9), (2.3717082451, 9.790569415), (2, 10.5))
            Line((2, 10.5), (-2, 10.5))
            ThreePointArc((-2, 10.5), (-2.5, 9), (-2, 7.5))
            Line((-2, 7.5), (2, 7.5))
        make_face()
        with BuildLine():
            ThreePointArc((-2, 7.5), (0, 6.5), (2, 7.5))
            Line((2, 7.5), (-2, 7.5))
        make_face()
    extrude(amount=F15_DEPTH)

    # F0 (on Top) → F16 (join)
    with BuildSketch(Plane.XY):
        with BuildLine():
            ThreePointArc((2, 7.5), (2.3717082451, 8.209430585), (2.5, 9))
            ThreePointArc((2.5, 9), (2.3717082451, 9.790569415), (2, 10.5))
            Line((2, 10.5), (-2, 10.5))
            ThreePointArc((-2, 10.5), (-2.5, 9), (-2, 7.5))
            Line((-2, 7.5), (2, 7.5))
        make_face()
    with SkipClean():  # cleaning this boolean's faces spoils the solid; the shape is the same uncleaned
        extrude(amount=F16_DEPTH)

    # F17
    f17_edges = [f15.edges().sort_by_distance(p)[0] for p in [
        (2.5, 9, 10),
        (-2.5, 9, 10),
    ]]
    fillet(f17_edges, radius=F17_R)


solid = Compound([f1.part, f7.part, f15.part])
